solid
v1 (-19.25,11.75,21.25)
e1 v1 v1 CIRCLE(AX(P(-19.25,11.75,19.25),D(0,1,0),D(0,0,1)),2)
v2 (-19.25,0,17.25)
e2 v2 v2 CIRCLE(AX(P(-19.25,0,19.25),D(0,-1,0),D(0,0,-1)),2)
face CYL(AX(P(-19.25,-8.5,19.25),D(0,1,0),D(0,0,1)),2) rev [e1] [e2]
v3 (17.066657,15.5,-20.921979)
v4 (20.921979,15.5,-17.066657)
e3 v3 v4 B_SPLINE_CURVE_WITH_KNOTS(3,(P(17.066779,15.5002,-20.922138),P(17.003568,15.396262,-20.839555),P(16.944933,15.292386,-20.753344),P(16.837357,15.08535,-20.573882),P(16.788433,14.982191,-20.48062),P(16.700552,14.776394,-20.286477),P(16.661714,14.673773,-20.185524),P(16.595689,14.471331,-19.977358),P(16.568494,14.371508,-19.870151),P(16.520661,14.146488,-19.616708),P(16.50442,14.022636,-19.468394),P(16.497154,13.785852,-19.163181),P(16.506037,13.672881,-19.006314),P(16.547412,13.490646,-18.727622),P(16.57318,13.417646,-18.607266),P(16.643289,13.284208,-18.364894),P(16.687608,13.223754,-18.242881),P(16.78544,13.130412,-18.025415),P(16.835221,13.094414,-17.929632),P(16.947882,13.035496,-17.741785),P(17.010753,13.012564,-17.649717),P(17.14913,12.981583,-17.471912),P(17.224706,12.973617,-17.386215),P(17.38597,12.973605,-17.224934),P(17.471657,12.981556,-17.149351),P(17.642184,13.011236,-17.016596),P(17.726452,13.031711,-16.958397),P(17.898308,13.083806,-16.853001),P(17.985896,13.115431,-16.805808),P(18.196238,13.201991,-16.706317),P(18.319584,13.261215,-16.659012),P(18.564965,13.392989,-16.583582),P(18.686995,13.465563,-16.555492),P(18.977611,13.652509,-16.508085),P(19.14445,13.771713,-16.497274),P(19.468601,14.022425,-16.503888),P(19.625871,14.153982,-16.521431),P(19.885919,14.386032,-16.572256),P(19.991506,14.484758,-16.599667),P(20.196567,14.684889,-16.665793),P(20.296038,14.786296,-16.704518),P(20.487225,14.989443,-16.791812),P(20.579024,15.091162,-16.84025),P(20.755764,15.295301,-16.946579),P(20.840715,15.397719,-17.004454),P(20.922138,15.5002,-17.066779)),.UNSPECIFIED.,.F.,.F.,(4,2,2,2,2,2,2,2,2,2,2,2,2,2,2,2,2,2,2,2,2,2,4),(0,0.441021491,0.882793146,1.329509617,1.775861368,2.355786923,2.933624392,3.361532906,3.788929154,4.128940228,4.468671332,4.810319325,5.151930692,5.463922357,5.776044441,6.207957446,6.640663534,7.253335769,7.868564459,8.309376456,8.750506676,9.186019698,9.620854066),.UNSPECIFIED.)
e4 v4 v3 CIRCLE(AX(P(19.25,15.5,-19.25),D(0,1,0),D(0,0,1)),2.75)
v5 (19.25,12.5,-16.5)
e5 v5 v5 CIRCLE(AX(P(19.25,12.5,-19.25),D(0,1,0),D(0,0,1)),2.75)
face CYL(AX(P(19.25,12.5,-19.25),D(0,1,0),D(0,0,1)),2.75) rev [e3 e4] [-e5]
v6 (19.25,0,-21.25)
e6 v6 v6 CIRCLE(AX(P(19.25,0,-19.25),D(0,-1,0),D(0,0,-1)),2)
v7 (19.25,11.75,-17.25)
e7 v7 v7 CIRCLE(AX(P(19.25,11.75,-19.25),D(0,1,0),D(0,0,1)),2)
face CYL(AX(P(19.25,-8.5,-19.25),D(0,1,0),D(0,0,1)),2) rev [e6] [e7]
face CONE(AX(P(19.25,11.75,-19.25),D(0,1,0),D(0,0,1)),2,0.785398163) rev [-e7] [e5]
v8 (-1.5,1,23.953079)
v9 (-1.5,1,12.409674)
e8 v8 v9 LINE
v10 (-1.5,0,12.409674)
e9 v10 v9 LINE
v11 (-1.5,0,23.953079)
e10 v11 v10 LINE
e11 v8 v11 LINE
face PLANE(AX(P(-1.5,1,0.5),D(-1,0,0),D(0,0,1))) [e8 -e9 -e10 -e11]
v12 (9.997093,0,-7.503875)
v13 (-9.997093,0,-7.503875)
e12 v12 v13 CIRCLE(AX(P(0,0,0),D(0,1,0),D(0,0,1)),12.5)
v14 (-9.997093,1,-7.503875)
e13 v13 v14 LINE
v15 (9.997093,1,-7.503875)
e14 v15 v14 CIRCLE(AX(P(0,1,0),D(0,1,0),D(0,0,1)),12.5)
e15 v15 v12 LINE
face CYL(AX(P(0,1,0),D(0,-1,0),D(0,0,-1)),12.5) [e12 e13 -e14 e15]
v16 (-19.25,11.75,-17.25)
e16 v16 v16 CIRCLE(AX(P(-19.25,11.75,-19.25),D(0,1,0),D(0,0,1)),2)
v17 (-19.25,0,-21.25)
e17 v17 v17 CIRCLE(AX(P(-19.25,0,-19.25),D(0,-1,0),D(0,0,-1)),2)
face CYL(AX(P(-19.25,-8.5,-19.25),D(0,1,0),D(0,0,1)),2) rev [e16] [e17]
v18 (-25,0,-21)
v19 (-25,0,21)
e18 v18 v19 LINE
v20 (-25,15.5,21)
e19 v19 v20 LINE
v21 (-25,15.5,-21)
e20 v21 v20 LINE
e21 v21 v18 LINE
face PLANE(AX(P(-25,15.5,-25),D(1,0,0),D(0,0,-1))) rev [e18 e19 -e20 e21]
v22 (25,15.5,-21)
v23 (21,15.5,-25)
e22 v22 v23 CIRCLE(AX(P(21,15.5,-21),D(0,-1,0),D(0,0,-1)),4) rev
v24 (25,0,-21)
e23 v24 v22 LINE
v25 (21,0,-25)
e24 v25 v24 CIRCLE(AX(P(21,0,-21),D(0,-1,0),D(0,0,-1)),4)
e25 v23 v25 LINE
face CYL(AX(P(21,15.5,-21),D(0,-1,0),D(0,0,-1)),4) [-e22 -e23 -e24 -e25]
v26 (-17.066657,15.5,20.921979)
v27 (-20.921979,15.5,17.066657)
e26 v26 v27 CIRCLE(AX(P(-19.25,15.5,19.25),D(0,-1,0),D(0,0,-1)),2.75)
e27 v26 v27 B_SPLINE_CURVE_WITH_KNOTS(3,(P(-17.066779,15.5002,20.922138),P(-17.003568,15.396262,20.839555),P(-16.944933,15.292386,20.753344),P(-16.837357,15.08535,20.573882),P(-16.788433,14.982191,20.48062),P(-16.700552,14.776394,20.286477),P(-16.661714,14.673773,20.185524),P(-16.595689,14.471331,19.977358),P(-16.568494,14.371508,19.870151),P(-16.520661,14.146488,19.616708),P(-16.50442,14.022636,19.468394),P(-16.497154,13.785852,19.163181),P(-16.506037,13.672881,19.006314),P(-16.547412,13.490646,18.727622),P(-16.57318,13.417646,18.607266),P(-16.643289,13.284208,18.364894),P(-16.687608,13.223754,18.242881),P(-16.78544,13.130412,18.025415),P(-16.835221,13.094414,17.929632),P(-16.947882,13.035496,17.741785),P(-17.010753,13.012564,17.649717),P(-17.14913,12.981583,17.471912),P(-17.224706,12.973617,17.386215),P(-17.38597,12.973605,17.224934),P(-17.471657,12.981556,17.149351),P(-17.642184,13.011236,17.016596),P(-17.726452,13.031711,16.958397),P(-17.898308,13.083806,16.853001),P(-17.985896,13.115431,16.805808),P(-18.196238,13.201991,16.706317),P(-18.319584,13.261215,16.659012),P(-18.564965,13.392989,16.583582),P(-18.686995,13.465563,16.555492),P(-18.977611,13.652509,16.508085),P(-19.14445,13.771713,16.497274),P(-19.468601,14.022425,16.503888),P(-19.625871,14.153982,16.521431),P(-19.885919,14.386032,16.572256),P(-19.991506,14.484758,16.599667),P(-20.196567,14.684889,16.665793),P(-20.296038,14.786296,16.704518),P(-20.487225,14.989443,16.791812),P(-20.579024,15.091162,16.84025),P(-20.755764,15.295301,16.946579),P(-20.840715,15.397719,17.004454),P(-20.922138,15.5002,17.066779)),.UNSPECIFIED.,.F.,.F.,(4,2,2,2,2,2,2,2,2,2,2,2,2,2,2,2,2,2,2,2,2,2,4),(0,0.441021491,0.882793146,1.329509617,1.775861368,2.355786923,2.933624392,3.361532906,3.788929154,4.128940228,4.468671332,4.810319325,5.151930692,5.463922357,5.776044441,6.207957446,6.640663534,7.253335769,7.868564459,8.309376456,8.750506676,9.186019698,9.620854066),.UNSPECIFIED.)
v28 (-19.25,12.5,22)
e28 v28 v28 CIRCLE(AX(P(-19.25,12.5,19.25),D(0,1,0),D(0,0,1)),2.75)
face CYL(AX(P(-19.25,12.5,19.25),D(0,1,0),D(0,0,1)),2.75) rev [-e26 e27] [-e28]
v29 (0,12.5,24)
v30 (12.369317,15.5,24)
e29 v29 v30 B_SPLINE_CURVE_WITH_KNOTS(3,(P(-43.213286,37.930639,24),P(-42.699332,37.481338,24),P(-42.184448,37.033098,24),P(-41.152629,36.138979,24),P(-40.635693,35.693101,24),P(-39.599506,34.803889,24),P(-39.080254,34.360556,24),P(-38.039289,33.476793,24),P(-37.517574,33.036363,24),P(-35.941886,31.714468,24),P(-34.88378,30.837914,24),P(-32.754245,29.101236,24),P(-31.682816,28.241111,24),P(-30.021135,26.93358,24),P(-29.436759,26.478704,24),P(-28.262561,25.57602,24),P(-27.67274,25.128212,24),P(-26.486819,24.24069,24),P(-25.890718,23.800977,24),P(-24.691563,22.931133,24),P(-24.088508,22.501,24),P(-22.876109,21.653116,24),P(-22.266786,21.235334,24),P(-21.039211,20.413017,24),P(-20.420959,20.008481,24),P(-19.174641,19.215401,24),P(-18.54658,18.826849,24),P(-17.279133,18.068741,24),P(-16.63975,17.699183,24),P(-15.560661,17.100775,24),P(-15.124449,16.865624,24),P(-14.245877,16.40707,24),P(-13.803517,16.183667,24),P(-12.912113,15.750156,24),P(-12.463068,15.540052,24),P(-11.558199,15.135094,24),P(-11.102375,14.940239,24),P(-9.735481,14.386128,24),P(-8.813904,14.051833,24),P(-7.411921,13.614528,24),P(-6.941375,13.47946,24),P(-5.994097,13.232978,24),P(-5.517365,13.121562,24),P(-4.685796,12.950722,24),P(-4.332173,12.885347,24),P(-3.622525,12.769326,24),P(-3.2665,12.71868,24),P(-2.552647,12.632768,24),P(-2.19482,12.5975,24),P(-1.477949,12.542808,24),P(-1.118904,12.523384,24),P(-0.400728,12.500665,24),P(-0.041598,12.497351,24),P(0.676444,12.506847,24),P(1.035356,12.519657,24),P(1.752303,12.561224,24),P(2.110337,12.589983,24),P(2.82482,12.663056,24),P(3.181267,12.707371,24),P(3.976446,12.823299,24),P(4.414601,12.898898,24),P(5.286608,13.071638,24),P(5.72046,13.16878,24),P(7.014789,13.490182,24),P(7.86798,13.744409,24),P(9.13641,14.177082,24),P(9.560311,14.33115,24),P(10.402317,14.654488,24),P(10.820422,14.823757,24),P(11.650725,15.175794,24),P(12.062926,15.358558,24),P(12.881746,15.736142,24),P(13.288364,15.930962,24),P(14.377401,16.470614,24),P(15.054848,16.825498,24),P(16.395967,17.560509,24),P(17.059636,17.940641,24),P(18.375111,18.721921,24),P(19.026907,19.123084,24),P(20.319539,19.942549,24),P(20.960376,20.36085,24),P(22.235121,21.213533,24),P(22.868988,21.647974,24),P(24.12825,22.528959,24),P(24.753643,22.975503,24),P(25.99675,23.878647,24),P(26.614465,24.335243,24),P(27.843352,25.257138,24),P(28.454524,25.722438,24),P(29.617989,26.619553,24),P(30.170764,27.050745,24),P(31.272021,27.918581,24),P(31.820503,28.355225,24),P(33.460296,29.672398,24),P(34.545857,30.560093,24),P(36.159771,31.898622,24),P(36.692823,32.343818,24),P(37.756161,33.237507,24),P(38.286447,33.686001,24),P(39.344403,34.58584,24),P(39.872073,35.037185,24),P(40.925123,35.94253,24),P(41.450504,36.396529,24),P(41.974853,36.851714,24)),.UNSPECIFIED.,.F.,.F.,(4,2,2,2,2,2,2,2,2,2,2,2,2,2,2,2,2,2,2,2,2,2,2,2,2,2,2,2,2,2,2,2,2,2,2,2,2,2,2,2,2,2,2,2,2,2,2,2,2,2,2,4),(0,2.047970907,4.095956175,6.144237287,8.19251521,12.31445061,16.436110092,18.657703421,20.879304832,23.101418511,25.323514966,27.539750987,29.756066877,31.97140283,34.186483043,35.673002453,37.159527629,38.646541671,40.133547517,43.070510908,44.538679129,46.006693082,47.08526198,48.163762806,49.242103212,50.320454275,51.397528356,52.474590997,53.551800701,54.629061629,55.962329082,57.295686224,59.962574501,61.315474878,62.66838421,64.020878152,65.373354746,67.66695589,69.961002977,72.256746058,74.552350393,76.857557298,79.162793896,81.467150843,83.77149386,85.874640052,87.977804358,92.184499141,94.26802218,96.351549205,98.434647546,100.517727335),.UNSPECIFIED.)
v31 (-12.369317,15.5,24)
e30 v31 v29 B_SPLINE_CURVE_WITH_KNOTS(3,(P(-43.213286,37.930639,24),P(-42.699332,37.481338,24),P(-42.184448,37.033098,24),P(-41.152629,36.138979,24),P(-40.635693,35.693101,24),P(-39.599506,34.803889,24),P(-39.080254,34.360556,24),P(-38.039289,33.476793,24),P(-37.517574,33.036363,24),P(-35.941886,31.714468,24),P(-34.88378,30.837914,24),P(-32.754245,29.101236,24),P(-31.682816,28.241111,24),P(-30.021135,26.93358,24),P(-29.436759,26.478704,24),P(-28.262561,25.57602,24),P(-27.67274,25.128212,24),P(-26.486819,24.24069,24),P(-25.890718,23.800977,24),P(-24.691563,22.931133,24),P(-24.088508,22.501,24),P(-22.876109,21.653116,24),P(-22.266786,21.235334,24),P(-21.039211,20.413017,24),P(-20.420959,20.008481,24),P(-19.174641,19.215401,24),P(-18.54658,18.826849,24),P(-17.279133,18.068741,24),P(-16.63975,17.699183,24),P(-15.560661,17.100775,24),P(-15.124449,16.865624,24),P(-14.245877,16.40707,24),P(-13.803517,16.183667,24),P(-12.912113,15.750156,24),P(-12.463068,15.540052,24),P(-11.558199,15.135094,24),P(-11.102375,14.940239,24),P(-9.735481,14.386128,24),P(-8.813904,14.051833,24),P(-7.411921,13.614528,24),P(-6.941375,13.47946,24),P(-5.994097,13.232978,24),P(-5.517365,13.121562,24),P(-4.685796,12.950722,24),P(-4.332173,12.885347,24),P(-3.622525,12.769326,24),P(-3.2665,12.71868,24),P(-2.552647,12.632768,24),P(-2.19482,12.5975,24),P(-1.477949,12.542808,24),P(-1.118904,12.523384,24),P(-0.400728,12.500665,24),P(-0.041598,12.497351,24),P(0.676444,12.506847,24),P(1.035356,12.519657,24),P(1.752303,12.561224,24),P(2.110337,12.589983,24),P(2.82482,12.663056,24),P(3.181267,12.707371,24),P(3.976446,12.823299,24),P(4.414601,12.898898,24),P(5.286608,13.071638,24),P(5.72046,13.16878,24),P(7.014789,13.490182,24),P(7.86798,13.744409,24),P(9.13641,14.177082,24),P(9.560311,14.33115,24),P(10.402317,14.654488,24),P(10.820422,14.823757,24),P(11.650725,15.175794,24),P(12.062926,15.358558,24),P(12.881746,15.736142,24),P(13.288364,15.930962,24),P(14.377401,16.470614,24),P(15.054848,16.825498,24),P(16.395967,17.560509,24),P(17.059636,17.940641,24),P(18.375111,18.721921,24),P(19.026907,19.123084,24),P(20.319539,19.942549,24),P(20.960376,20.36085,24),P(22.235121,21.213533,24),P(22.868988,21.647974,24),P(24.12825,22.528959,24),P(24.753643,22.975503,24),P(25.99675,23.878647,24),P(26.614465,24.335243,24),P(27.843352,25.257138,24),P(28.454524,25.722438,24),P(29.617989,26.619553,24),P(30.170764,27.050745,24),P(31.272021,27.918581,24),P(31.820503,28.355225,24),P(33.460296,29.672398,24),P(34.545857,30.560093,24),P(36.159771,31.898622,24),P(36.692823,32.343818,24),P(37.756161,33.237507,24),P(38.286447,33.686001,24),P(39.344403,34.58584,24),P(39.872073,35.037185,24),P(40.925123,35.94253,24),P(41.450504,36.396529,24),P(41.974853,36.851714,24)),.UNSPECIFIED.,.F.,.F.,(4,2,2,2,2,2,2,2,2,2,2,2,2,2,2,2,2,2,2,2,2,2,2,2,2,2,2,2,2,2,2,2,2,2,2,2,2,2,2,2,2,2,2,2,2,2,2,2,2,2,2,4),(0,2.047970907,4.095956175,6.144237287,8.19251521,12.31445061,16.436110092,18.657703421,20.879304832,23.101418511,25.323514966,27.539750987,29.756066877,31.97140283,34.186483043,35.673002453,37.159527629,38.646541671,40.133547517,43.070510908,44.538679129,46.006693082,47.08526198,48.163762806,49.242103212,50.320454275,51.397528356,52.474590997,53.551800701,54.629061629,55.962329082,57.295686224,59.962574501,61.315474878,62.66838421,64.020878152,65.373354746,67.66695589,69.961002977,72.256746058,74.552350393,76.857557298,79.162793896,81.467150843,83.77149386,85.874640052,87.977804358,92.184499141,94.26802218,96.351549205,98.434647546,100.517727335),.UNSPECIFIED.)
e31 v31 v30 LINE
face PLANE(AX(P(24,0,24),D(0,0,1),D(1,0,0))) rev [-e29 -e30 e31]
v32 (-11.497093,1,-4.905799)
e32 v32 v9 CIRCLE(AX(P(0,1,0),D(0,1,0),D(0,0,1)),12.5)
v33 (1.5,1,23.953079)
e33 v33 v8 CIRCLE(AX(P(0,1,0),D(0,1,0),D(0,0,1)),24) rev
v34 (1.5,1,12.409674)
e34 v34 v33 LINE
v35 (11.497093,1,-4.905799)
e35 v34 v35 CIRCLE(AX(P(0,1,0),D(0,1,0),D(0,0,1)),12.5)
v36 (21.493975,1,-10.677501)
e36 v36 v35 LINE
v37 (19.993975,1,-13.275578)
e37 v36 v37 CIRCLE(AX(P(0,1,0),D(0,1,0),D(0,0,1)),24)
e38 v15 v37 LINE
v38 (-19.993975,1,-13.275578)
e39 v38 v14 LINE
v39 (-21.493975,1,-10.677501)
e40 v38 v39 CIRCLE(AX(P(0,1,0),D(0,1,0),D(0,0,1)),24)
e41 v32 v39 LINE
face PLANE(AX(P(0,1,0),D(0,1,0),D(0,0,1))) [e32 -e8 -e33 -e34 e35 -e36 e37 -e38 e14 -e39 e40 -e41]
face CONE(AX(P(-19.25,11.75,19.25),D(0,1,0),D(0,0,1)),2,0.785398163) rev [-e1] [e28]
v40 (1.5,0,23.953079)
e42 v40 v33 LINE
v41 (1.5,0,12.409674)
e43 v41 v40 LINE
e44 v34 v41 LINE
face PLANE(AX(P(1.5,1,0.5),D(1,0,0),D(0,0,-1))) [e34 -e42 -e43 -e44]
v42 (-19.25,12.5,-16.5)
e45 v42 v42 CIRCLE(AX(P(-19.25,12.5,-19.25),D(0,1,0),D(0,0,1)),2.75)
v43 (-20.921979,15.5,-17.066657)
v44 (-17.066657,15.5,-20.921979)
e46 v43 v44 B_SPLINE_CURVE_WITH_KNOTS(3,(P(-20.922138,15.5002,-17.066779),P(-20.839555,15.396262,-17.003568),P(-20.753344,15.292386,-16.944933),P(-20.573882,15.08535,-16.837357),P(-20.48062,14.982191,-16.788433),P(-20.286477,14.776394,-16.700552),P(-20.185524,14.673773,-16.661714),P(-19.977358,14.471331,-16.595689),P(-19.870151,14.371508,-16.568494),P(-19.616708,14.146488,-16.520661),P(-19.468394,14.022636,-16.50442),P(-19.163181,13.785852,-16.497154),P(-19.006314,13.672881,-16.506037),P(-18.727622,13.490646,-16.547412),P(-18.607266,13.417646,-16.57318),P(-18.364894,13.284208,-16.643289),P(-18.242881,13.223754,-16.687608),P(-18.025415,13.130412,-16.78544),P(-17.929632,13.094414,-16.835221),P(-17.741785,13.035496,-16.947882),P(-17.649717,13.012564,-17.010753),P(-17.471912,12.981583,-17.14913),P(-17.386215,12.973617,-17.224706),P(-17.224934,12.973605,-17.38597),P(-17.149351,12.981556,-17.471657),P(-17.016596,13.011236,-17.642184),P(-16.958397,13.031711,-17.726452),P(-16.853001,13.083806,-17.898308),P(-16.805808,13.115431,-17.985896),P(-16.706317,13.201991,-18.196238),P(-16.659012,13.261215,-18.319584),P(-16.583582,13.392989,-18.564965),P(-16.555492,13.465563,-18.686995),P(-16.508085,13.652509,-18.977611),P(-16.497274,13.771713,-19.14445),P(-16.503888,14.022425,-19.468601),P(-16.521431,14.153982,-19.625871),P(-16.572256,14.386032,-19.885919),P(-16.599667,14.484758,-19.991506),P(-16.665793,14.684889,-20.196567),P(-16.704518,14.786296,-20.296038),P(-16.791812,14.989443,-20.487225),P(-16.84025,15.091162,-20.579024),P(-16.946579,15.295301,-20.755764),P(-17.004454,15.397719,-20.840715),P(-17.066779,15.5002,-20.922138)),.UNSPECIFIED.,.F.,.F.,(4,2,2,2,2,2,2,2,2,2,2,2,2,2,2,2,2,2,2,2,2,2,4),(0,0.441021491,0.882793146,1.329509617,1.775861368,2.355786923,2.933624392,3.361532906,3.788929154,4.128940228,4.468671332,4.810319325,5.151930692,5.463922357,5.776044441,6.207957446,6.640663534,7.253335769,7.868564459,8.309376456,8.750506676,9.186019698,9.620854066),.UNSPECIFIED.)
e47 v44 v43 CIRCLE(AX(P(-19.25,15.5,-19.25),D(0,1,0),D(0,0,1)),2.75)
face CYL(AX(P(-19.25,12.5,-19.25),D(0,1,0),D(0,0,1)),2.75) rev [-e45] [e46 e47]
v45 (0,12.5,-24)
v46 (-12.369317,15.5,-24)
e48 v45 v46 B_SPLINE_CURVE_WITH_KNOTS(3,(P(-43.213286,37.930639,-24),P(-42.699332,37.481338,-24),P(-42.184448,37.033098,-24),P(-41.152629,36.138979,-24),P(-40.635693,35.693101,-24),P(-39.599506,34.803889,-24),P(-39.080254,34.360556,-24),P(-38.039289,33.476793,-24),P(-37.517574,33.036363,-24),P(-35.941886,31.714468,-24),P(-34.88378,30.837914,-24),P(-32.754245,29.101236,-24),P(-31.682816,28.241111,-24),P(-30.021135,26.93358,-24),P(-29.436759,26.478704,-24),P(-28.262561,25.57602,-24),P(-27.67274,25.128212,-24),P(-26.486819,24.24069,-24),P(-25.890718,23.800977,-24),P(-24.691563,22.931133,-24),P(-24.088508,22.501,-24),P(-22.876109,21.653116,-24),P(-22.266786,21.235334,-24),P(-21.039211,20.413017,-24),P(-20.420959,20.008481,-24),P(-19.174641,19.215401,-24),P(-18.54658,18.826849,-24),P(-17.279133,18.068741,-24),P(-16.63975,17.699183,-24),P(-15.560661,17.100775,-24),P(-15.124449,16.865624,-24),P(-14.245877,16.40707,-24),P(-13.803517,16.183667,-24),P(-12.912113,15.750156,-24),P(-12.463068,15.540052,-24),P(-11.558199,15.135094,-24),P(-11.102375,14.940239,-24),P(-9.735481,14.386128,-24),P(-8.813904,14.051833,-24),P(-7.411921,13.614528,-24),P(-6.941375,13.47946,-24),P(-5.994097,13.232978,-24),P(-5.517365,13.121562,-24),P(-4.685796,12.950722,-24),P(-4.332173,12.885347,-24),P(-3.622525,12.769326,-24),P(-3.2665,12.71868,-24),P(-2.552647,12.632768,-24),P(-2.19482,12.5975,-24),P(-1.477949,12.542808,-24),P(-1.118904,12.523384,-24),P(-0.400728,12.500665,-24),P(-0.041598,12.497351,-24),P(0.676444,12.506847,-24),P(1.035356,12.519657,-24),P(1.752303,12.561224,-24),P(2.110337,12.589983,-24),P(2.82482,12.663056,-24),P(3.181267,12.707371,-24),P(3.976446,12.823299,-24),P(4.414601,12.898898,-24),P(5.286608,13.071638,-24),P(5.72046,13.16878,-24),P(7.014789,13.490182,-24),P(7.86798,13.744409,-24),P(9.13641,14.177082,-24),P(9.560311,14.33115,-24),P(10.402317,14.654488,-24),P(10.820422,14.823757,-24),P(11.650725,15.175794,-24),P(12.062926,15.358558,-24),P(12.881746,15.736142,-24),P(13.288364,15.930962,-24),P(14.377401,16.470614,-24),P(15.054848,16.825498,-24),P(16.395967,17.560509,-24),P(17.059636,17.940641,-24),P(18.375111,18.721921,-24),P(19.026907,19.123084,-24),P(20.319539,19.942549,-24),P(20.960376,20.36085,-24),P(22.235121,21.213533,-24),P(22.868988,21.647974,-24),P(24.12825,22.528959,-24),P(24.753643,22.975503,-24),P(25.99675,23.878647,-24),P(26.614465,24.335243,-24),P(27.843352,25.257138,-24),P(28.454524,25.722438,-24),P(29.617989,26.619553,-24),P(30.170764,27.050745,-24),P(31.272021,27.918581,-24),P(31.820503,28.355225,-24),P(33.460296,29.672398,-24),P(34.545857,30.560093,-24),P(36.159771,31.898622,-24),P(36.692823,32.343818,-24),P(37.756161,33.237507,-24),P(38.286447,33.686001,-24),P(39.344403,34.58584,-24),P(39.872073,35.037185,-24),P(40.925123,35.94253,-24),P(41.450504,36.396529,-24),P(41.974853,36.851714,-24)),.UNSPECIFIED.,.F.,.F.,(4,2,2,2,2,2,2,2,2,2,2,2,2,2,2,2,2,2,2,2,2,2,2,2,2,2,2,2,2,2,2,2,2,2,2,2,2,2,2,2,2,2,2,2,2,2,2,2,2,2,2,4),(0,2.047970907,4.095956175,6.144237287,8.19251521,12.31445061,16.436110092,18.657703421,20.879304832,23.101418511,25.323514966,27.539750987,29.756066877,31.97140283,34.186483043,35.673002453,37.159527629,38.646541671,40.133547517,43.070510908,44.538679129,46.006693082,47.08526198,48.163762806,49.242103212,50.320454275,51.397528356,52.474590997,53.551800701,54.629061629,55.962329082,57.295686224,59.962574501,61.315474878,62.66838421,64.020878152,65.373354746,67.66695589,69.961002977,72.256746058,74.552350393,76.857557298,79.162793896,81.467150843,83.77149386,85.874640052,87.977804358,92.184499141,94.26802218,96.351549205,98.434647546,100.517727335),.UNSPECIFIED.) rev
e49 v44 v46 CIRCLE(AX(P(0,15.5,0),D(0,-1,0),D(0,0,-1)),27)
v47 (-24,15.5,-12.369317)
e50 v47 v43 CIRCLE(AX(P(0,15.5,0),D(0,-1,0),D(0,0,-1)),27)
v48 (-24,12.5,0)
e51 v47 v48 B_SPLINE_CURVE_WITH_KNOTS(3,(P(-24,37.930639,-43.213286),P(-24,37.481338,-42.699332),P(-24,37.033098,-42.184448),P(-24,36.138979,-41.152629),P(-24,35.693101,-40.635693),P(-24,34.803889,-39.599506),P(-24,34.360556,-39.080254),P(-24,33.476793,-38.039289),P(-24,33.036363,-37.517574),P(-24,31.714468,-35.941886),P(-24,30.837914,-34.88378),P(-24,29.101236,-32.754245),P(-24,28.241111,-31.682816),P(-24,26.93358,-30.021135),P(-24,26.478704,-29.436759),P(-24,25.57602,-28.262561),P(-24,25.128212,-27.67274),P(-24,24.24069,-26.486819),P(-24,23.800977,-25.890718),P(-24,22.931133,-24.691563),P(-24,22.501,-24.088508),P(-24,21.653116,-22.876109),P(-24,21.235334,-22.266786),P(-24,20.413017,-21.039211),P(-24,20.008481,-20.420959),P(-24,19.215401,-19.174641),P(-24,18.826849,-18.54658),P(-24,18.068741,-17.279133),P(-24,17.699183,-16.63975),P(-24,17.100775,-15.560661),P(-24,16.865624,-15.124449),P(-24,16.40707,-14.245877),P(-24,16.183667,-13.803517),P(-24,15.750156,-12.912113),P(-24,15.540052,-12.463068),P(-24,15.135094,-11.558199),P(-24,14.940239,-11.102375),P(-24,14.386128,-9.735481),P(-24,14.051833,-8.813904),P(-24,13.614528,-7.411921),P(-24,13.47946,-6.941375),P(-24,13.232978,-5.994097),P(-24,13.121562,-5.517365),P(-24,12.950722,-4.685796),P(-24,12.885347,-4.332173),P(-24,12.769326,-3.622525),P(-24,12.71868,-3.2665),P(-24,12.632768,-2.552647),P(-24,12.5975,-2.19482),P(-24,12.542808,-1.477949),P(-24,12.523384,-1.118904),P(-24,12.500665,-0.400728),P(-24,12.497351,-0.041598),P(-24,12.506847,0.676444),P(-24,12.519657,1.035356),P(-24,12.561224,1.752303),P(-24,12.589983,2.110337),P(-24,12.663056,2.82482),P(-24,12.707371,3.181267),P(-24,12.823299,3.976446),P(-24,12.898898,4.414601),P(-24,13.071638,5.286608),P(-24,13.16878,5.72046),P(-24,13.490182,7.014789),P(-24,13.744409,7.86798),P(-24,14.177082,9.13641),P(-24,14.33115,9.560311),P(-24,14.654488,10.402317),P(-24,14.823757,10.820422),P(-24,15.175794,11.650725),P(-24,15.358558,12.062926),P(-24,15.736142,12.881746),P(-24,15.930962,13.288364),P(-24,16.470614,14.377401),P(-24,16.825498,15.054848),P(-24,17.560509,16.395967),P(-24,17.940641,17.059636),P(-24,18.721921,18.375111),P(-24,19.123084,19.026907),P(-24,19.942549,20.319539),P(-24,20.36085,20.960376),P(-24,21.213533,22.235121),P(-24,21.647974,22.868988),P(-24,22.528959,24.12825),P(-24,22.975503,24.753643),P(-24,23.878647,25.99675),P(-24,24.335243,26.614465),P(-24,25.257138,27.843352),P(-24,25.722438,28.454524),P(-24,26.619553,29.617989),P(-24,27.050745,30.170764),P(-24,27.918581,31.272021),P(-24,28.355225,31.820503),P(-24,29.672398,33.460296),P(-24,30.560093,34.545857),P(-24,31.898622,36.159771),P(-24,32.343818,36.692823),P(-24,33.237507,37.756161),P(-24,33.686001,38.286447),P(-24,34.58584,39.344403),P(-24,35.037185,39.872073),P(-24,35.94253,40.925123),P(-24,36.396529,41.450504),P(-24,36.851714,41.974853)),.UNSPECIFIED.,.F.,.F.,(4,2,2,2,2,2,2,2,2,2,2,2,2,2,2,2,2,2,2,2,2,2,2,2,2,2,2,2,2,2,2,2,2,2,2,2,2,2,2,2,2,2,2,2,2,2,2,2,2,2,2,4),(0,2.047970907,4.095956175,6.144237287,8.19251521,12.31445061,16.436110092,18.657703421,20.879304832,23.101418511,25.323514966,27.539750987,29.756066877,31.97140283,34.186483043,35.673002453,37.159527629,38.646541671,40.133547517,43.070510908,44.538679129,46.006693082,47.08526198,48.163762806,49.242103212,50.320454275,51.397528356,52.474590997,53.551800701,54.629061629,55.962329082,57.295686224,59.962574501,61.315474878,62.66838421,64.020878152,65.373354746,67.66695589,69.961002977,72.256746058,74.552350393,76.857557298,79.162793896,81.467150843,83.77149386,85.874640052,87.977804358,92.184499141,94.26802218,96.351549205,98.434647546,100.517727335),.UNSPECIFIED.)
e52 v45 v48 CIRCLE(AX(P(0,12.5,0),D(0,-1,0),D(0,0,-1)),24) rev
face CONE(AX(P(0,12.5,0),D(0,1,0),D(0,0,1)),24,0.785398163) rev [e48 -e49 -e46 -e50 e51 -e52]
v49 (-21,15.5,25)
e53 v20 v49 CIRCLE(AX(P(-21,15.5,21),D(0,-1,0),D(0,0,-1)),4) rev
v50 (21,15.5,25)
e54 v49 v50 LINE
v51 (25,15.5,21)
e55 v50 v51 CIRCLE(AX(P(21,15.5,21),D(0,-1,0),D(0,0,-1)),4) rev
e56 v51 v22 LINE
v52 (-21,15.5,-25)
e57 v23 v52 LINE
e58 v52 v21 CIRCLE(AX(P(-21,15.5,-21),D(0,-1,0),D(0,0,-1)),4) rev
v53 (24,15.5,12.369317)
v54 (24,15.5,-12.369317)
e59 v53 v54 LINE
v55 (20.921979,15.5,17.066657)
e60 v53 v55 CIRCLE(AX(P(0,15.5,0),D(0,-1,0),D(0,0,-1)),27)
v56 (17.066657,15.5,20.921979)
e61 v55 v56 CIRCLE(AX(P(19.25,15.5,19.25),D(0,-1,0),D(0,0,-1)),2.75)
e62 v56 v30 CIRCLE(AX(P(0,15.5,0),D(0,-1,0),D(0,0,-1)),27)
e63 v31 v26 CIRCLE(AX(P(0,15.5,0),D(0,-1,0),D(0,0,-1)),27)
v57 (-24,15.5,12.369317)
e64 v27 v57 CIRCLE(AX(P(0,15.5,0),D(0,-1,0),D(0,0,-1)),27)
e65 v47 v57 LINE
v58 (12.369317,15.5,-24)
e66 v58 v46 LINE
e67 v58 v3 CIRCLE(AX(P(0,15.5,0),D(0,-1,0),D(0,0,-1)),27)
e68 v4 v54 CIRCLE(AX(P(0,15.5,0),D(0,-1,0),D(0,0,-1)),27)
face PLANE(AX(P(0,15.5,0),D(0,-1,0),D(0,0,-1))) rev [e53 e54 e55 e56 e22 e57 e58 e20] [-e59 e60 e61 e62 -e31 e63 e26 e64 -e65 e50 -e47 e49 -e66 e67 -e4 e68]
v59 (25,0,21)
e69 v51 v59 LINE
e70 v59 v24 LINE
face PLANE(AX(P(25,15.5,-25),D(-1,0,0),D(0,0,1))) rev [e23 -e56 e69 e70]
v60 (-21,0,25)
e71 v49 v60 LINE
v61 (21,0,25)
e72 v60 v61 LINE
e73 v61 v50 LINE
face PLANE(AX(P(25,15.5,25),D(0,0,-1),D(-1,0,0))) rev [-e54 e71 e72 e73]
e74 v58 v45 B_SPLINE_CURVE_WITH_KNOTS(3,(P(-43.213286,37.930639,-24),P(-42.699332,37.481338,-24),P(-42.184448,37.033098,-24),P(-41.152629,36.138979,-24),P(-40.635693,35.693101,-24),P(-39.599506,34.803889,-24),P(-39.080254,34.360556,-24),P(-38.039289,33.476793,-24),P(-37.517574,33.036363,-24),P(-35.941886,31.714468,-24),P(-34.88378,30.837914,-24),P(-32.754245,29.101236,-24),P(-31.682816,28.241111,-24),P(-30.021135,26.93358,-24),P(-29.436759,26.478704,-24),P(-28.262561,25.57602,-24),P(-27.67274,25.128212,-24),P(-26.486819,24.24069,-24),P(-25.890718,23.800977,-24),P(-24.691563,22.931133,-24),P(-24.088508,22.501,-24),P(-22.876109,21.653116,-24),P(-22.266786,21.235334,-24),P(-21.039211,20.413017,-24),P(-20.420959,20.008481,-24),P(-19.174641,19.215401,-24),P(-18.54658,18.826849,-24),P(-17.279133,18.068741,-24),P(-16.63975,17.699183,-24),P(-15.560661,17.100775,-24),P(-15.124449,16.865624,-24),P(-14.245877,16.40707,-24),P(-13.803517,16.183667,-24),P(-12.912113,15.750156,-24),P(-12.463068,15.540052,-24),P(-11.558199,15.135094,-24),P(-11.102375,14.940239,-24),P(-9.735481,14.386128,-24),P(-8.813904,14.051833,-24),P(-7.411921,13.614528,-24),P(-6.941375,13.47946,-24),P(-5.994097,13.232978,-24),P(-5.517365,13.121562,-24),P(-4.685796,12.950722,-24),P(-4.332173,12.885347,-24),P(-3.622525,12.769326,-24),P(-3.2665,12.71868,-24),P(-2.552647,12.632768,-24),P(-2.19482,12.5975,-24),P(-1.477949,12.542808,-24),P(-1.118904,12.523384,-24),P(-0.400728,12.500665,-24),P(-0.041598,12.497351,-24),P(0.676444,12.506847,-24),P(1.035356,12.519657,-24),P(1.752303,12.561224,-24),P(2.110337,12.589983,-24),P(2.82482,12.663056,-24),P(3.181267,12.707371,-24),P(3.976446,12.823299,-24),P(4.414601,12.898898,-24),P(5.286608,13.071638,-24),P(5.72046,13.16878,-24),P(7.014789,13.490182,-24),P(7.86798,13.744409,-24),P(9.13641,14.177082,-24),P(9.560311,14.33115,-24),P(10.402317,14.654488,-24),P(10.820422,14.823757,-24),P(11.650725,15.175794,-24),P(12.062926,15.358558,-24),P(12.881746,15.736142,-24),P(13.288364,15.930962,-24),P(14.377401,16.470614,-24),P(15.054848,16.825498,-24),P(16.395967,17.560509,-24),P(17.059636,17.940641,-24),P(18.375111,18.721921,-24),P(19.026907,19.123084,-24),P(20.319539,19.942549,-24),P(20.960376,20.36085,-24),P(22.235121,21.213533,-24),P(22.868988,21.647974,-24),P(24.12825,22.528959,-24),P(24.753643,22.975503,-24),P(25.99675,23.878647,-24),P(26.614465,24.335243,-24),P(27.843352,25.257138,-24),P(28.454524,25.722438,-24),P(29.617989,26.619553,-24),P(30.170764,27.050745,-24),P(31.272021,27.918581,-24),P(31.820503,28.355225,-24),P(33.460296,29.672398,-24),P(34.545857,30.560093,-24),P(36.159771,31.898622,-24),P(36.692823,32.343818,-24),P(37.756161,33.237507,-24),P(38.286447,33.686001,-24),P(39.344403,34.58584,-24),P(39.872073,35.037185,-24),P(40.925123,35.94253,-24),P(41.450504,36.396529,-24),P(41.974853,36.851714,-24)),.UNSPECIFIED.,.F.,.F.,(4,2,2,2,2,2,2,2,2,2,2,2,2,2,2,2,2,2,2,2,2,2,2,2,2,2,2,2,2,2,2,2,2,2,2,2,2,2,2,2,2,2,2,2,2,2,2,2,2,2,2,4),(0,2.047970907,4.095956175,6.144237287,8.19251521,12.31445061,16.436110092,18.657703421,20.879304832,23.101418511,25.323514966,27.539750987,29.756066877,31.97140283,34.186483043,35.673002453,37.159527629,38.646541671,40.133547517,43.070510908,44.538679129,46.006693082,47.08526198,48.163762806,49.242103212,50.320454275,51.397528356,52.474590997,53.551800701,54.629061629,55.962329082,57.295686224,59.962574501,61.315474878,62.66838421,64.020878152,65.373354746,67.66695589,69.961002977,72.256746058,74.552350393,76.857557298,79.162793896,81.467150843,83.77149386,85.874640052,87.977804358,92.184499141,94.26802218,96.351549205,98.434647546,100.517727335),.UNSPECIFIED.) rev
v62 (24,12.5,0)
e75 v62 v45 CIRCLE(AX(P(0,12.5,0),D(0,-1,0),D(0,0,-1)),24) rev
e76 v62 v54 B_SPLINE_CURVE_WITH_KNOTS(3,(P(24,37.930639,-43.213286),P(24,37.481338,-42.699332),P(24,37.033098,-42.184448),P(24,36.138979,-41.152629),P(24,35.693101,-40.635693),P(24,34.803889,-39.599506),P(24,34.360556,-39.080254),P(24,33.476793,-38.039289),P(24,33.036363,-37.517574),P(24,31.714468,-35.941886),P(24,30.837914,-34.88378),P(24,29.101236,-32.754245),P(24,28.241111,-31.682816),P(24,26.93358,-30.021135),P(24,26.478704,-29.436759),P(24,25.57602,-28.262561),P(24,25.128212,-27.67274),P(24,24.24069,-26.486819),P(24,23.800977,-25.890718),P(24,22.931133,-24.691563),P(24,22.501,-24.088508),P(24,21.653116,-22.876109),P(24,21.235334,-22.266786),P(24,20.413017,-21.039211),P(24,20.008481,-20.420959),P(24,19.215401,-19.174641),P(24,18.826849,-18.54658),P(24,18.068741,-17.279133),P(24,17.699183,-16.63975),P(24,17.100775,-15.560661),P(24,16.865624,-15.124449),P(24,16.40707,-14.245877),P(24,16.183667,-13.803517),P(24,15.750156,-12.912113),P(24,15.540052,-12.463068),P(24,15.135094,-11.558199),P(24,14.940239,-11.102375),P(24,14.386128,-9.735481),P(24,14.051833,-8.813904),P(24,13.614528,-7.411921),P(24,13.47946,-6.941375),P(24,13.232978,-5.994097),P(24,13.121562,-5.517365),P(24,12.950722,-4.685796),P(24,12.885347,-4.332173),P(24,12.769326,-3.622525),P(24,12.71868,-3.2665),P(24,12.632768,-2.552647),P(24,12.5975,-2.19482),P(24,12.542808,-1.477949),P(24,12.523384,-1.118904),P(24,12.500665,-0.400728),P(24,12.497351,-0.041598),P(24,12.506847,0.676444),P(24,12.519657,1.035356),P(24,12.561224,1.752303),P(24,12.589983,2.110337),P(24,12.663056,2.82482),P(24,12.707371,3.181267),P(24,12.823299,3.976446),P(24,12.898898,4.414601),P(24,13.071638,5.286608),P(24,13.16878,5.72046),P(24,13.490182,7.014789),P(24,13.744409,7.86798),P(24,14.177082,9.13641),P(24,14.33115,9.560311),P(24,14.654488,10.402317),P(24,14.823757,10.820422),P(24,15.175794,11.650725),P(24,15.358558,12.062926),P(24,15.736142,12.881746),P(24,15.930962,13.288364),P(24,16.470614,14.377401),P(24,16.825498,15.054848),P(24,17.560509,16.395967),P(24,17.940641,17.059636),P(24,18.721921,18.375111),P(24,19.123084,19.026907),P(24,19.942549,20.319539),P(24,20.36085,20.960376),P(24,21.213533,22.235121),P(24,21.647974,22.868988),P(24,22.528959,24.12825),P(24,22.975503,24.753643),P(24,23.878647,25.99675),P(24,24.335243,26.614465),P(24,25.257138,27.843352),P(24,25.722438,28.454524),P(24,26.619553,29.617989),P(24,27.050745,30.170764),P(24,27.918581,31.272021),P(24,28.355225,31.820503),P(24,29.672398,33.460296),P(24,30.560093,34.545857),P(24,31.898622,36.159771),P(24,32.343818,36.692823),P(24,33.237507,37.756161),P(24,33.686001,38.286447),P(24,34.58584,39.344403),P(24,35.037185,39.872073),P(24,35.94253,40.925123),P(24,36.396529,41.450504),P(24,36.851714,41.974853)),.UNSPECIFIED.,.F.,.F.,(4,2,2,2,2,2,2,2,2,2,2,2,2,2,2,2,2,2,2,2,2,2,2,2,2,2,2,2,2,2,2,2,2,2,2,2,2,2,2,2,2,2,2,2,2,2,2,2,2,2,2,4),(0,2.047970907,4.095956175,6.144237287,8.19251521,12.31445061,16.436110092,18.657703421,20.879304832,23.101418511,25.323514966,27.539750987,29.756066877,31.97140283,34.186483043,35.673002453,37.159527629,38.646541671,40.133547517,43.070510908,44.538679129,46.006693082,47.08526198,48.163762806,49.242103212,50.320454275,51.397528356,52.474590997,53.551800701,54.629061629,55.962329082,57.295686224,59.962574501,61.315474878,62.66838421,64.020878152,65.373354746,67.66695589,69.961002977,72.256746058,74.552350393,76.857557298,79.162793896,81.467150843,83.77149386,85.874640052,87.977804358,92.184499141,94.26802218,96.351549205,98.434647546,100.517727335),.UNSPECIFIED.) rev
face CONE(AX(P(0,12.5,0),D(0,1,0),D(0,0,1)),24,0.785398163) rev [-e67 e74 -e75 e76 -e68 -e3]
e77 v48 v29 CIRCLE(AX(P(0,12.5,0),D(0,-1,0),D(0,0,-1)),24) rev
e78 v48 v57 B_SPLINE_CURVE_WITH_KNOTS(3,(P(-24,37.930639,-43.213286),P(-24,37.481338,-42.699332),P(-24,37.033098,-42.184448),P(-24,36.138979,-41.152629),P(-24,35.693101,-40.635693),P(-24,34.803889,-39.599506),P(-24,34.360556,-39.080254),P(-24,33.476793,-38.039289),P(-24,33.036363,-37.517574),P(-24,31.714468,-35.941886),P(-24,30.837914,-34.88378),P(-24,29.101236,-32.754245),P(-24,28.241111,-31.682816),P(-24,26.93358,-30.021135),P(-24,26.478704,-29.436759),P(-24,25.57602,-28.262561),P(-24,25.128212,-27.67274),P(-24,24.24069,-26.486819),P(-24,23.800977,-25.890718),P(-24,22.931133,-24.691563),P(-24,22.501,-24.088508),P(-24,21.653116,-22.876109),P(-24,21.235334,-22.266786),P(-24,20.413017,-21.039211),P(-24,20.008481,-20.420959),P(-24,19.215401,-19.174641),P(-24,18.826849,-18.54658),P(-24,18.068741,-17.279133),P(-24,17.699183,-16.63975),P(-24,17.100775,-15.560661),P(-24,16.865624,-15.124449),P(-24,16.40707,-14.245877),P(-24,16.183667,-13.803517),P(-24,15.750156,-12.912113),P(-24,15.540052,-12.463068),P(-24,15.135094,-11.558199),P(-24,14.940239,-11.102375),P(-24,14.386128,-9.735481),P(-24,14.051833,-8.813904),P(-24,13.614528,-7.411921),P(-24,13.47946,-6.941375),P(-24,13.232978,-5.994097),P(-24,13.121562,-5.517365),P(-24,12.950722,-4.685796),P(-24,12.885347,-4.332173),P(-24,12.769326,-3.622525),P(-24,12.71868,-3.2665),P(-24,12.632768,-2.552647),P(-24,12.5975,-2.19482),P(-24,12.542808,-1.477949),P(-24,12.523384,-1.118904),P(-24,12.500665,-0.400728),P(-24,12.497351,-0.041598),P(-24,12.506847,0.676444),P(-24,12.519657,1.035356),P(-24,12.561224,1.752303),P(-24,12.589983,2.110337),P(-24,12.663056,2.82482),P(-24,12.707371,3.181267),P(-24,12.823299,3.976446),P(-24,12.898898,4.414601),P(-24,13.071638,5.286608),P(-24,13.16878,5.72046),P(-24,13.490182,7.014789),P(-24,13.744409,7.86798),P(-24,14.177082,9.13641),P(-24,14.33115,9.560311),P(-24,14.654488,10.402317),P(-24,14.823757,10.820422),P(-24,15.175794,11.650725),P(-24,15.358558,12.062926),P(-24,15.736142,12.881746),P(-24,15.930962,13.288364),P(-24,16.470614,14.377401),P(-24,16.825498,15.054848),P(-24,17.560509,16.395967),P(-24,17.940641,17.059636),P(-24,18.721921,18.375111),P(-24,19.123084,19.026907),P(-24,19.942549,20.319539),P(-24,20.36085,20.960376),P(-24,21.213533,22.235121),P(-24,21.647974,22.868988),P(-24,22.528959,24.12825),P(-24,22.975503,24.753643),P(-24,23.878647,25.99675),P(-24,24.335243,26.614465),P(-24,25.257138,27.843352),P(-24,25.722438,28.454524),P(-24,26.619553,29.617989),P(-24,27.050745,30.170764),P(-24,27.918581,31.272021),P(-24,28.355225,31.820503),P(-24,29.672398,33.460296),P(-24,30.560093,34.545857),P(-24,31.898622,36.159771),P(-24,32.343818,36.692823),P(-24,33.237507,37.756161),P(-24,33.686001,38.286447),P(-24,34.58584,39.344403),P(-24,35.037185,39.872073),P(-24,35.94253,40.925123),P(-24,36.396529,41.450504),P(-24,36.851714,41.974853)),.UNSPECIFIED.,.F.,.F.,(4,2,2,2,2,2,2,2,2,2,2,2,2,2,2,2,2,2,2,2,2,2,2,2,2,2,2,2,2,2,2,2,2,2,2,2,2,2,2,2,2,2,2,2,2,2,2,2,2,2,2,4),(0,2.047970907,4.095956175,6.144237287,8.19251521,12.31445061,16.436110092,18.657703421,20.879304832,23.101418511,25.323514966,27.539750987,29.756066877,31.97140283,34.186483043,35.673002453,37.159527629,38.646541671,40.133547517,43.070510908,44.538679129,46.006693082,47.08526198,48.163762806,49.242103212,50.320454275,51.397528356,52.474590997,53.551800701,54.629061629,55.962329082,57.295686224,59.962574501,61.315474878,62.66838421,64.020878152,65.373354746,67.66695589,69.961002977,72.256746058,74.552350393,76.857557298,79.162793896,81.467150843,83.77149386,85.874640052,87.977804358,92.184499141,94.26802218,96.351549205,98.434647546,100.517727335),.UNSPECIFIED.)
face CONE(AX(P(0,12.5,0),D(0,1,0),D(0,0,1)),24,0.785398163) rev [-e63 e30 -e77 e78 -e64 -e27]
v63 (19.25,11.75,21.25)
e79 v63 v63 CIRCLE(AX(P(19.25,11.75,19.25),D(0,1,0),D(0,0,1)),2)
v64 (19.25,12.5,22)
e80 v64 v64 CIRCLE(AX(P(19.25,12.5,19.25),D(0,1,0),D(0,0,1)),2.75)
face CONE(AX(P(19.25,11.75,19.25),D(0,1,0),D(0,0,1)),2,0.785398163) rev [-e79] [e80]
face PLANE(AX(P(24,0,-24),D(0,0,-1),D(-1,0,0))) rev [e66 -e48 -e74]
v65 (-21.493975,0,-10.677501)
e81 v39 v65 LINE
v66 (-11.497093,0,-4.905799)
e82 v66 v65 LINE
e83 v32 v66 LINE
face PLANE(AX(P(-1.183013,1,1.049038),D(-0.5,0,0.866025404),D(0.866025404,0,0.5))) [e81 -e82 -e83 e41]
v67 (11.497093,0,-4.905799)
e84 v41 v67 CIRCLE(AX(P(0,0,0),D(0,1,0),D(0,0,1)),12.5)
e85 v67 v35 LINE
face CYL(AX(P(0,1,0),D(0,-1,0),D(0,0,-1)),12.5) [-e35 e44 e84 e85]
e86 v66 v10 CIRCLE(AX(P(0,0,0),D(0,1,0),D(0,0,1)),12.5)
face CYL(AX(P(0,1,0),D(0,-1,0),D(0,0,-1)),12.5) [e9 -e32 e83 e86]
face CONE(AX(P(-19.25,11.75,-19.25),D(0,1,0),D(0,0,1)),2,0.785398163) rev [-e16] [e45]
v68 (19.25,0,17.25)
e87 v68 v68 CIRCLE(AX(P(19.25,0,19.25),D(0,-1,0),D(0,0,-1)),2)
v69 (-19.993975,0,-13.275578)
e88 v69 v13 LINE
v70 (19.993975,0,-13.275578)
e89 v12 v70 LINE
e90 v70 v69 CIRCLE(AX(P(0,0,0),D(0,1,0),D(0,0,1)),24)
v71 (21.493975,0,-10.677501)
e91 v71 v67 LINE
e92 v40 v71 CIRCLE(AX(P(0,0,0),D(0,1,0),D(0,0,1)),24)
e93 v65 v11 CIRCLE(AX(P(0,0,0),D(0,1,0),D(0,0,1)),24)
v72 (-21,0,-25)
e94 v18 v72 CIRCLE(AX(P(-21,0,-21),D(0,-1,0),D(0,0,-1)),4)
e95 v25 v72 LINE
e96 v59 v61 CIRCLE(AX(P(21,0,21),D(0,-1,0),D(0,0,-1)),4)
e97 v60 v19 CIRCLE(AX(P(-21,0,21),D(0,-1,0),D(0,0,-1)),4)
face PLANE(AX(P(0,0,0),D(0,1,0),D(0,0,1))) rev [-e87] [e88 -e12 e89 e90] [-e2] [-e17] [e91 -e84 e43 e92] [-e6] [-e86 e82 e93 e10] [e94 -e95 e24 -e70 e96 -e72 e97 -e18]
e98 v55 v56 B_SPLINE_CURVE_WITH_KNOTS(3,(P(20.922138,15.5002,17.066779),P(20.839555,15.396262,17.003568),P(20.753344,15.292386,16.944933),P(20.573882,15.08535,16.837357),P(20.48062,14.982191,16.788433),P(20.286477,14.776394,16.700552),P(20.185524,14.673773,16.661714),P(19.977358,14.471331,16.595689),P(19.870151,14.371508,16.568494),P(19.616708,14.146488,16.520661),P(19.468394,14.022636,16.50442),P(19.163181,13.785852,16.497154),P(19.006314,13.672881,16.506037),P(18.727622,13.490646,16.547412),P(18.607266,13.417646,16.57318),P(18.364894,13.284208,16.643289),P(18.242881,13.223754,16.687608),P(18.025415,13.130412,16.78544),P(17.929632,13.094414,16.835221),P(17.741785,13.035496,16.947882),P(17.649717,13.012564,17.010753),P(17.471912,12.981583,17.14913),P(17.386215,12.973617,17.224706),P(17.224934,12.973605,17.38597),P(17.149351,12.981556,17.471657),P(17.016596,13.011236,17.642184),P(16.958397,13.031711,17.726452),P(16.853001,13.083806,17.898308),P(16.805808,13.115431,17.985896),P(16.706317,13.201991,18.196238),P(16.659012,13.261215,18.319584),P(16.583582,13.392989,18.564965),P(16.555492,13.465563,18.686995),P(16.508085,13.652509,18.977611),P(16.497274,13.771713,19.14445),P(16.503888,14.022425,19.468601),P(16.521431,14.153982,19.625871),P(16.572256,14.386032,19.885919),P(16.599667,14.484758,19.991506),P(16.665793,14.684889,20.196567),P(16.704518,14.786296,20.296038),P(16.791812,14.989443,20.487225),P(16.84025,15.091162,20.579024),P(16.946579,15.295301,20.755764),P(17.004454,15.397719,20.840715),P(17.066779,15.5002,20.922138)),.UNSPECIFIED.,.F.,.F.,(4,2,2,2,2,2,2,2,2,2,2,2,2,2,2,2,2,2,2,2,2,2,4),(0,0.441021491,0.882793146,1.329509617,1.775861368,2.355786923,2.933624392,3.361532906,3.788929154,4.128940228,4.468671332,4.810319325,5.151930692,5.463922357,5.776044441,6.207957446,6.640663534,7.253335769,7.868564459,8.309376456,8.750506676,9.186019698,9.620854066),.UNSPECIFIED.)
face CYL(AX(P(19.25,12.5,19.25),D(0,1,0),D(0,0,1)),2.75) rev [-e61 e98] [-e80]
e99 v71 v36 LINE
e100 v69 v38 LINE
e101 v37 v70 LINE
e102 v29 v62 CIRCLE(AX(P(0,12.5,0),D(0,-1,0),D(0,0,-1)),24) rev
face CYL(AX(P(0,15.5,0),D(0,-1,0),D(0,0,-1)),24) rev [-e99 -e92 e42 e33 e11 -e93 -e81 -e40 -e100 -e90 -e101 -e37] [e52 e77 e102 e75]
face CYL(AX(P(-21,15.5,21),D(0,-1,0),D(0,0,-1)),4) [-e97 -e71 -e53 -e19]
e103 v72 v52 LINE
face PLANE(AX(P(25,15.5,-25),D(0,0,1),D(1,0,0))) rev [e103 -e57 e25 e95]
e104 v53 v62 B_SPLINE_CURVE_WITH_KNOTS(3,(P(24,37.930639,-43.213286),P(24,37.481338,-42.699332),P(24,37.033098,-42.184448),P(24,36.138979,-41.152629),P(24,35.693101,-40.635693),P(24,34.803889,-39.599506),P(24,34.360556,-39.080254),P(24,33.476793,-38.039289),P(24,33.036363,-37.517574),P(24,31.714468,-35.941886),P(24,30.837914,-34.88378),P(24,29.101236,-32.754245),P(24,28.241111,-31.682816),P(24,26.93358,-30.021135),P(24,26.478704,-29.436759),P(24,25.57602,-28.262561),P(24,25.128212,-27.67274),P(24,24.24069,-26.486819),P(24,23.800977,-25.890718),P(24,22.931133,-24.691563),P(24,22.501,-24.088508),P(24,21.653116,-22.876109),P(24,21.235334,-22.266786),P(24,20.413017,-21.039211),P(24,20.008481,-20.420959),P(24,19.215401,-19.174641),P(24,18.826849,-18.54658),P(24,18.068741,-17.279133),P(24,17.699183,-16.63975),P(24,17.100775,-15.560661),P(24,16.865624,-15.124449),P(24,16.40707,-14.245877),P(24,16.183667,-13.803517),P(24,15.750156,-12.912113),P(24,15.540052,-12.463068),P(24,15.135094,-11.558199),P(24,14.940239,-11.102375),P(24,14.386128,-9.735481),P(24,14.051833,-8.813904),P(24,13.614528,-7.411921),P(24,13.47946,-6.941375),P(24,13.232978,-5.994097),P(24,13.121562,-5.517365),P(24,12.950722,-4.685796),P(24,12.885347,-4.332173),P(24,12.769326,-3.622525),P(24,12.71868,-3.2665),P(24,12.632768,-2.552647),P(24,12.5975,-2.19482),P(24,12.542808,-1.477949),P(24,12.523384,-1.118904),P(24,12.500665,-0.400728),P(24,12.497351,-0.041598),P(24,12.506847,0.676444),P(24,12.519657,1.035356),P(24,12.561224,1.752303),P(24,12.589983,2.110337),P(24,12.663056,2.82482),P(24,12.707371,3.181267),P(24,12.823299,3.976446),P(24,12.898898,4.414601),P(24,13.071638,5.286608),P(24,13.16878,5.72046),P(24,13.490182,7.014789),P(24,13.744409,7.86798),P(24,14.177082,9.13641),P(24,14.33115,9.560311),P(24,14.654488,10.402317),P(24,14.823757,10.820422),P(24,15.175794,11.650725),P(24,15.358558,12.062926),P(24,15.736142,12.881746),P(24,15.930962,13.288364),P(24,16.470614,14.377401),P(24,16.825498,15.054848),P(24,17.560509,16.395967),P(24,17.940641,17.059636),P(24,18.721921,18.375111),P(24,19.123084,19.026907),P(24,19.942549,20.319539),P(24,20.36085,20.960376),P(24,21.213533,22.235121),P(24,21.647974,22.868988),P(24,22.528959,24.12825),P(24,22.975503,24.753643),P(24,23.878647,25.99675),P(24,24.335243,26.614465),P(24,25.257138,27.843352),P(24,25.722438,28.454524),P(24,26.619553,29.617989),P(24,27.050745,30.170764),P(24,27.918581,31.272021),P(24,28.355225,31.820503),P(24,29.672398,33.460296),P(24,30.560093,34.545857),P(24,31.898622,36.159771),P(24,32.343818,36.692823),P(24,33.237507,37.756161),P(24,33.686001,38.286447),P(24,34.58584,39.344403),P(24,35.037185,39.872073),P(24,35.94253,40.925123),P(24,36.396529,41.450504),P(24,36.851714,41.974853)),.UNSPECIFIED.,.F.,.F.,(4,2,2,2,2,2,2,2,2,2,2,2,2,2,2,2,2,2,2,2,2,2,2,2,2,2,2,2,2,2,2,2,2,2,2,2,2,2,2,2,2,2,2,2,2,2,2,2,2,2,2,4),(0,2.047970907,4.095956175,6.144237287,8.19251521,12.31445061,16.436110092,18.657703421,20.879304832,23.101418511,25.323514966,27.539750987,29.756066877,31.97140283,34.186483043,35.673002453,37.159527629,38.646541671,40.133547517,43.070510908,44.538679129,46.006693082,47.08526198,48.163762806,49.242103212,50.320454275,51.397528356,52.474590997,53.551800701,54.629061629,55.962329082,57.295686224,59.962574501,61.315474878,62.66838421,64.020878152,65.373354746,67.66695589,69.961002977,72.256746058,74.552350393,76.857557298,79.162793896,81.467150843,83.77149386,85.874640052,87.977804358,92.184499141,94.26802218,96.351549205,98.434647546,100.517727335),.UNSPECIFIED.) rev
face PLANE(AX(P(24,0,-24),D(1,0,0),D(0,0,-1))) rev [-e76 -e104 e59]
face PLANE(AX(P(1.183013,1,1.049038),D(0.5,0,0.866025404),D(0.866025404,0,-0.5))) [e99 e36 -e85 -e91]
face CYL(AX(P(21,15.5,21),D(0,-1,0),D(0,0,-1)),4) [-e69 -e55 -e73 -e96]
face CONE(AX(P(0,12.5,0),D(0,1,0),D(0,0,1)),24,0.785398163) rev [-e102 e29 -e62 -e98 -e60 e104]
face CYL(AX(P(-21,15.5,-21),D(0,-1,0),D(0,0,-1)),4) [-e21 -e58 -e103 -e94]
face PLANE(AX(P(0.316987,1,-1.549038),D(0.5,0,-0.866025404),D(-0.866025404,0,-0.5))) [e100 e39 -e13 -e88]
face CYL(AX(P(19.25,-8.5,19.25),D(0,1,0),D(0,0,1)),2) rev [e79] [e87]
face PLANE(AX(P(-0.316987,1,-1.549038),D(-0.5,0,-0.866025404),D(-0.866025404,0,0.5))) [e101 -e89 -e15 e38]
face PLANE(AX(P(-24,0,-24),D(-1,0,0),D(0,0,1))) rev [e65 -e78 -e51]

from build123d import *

# Parameters (mm, degrees)
SKETCH1_W           = 50
SKETCH1_H           = 50
SKETCH1_R           = 24
BOSS_EXTRUDE1_DEPTH = 15.5
CHAMFER1_SIZE       = 3
SKETCH4_W           = 50
SKETCH4_H           = 50
SKETCH4_W_2         = 48
SKETCH4_H_2         = 48
BOSS_EXTRUDE2_DEPTH = 15.5
SKETCH5_R           = 2.75
CUT_EXTRUDE1_DEPTH  = 3
FILLET1_R           = 4
SKETCH6_R           = 12.5
BOSS_EXTRUDE5_DEPTH = 1
SKETCH7_R           = 2
CUT_EXTRUDE2_DEPTH  = 21
CHAMFER3_SIZE       = 0.75
SKETCH9_W           = 3
SKETCH9_H           = 24
BOSS_EXTRUDE6_DEPTH = 1
CIRPATTERN1_COUNT   = 3


# Some blends are built 0.0001 mm under size
with BuildPart() as part:
    # Sketch1 → Boss-Extrude1 (new body)
    with BuildSketch(Plane(origin=(0, 0, 0), x_dir=(1, 0, 0), z_dir=(0, 1, 0))):
        Rectangle(SKETCH1_W, SKETCH1_H)
        with Locations(Location((0, 0, 0), (0, 0, 270))):
            Circle(SKETCH1_R, mode=Mode.SUBTRACT)
    extrude(amount=BOSS_EXTRUDE1_DEPTH)

    # Chamfer1
    # the kernel refuses this chamfer: 3 mm, written as the material it takes off along each edge
    with BuildSketch(Plane(origin=(0, 15.5, 0), x_dir=(0, 0, 1), z_dir=(-1, 0, 0))) as chamfer1_piece_1:
        Polygon((24, -CHAMFER1_SIZE), (24 + CHAMFER1_SIZE, 0), (24, 0), align=None)
    revolve(axis=Axis((0, 15.5, 0), (0, 1, 0)), mode=Mode.SUBTRACT)

    # Sketch4 → Boss-Extrude2 (add)
    with BuildSketch(Plane(origin=(0, 15.5, 0), x_dir=(1, 0, 0), z_dir=(0, 1, 0))):
        Rectangle(SKETCH4_W, SKETCH4_H)
        Rectangle(SKETCH4_W_2, SKETCH4_H_2, mode=Mode.SUBTRACT)
    extrude(amount=-BOSS_EXTRUDE2_DEPTH)

    # Sketch5 → Cut-Extrude1 (cut)
    with BuildSketch(Plane(origin=(0, 15.5, 0), x_dir=(1, 0, 0), z_dir=(0, 1, 0))):
        with Locations(Location((-19.25, 19.25, 0), (0, 0, 270))):
            Circle(SKETCH5_R)
        with Locations(Location((19.25, 19.25, 0), (0, 0, 270))):
            Circle(SKETCH5_R)
        with Locations(Location((19.25, -19.25, 0), (0, 0, 270))):
            Circle(SKETCH5_R)
        with Locations(Location((-19.25, -19.25, 0), (0, 0, 270))):
            Circle(SKETCH5_R)
    extrude(amount=-CUT_EXTRUDE1_DEPTH, mode=Mode.SUBTRACT)

    # Fillet1
    fillet1_edges = [part.edges().sort_by_distance(p)[0] for p in [
        (-25, 7.75, -25),
        (25, 7.75, -25),
        (25, 7.75, 25),
        (-25, 7.75, 25),
    ]]
    fillet(fillet1_edges, radius=FILLET1_R)

    # Sketch7 → Cut-Extrude2 (cut)
    with BuildSketch(Plane(origin=(0, 12.5, 0), x_dir=(1, 0, 0), z_dir=(0, 1, 0))):
        with Locations(Location((-19.25, 19.25, 0), (0, 0, 270))):
            Circle(SKETCH7_R)
        with Locations(Location((-19.25, -19.25, 0), (0, 0, 270))):
            Circle(SKETCH7_R)
        with Locations(Location((19.25, -19.25, 0), (0, 0, 270))):
            Circle(SKETCH7_R)
        with Locations(Location((19.25, 19.25, 0), (0, 0, 270))):
            Circle(SKETCH7_R)
    extrude(amount=-CUT_EXTRUDE2_DEPTH, mode=Mode.SUBTRACT)

    # Chamfer3
    chamfer3_edges = [part.edges().sort_by_distance(p)[0] for p in [
        (-19.25, 12.5, -21.25),
        (-19.25, 12.5, 17.25),
        (19.25, 12.5, 17.25),
        (19.25, 12.5, -21.25),
    ]]
    chamfer(chamfer3_edges, length=CHAMFER3_SIZE - 0.0001)  # a hair under: the kernel refuses the full size



with BuildPart() as body_2:
    # Sketch6 → Boss-Extrude5 (new body)
    with BuildSketch(Plane(origin=(0, 0, 0), x_dir=(1, 0, 0), z_dir=(0, 1, 0))):
        with Locations(Location((0, 0, 0), (0, 0, 270))):
            Circle(SKETCH6_R)
    extrude(amount=BOSS_EXTRUDE5_DEPTH)


with BuildPart() as part_1:
    add(part.part)

    add(body_2.part)  # Boss-Extrude6 merges body 2
    # Sketch9 → Boss-Extrude6 (add)
    with BuildSketch(Plane.XZ):
        with Locations((0, 12.5)):
            Rectangle(SKETCH9_W, SKETCH9_H)
    boss_extrude6 = extrude(amount=-BOSS_EXTRUDE6_DEPTH)

    # CirPattern1: Boss-Extrude6 ×3 about axis
    cirpattern1_axis = Axis((0, 0, 0), (0, 1, 0))
    for i in range(1, CIRPATTERN1_COUNT):
        add(boss_extrude6.rotate(cirpattern1_axis, i * 360 / CIRPATTERN1_COUNT))


solid = part_1.part
